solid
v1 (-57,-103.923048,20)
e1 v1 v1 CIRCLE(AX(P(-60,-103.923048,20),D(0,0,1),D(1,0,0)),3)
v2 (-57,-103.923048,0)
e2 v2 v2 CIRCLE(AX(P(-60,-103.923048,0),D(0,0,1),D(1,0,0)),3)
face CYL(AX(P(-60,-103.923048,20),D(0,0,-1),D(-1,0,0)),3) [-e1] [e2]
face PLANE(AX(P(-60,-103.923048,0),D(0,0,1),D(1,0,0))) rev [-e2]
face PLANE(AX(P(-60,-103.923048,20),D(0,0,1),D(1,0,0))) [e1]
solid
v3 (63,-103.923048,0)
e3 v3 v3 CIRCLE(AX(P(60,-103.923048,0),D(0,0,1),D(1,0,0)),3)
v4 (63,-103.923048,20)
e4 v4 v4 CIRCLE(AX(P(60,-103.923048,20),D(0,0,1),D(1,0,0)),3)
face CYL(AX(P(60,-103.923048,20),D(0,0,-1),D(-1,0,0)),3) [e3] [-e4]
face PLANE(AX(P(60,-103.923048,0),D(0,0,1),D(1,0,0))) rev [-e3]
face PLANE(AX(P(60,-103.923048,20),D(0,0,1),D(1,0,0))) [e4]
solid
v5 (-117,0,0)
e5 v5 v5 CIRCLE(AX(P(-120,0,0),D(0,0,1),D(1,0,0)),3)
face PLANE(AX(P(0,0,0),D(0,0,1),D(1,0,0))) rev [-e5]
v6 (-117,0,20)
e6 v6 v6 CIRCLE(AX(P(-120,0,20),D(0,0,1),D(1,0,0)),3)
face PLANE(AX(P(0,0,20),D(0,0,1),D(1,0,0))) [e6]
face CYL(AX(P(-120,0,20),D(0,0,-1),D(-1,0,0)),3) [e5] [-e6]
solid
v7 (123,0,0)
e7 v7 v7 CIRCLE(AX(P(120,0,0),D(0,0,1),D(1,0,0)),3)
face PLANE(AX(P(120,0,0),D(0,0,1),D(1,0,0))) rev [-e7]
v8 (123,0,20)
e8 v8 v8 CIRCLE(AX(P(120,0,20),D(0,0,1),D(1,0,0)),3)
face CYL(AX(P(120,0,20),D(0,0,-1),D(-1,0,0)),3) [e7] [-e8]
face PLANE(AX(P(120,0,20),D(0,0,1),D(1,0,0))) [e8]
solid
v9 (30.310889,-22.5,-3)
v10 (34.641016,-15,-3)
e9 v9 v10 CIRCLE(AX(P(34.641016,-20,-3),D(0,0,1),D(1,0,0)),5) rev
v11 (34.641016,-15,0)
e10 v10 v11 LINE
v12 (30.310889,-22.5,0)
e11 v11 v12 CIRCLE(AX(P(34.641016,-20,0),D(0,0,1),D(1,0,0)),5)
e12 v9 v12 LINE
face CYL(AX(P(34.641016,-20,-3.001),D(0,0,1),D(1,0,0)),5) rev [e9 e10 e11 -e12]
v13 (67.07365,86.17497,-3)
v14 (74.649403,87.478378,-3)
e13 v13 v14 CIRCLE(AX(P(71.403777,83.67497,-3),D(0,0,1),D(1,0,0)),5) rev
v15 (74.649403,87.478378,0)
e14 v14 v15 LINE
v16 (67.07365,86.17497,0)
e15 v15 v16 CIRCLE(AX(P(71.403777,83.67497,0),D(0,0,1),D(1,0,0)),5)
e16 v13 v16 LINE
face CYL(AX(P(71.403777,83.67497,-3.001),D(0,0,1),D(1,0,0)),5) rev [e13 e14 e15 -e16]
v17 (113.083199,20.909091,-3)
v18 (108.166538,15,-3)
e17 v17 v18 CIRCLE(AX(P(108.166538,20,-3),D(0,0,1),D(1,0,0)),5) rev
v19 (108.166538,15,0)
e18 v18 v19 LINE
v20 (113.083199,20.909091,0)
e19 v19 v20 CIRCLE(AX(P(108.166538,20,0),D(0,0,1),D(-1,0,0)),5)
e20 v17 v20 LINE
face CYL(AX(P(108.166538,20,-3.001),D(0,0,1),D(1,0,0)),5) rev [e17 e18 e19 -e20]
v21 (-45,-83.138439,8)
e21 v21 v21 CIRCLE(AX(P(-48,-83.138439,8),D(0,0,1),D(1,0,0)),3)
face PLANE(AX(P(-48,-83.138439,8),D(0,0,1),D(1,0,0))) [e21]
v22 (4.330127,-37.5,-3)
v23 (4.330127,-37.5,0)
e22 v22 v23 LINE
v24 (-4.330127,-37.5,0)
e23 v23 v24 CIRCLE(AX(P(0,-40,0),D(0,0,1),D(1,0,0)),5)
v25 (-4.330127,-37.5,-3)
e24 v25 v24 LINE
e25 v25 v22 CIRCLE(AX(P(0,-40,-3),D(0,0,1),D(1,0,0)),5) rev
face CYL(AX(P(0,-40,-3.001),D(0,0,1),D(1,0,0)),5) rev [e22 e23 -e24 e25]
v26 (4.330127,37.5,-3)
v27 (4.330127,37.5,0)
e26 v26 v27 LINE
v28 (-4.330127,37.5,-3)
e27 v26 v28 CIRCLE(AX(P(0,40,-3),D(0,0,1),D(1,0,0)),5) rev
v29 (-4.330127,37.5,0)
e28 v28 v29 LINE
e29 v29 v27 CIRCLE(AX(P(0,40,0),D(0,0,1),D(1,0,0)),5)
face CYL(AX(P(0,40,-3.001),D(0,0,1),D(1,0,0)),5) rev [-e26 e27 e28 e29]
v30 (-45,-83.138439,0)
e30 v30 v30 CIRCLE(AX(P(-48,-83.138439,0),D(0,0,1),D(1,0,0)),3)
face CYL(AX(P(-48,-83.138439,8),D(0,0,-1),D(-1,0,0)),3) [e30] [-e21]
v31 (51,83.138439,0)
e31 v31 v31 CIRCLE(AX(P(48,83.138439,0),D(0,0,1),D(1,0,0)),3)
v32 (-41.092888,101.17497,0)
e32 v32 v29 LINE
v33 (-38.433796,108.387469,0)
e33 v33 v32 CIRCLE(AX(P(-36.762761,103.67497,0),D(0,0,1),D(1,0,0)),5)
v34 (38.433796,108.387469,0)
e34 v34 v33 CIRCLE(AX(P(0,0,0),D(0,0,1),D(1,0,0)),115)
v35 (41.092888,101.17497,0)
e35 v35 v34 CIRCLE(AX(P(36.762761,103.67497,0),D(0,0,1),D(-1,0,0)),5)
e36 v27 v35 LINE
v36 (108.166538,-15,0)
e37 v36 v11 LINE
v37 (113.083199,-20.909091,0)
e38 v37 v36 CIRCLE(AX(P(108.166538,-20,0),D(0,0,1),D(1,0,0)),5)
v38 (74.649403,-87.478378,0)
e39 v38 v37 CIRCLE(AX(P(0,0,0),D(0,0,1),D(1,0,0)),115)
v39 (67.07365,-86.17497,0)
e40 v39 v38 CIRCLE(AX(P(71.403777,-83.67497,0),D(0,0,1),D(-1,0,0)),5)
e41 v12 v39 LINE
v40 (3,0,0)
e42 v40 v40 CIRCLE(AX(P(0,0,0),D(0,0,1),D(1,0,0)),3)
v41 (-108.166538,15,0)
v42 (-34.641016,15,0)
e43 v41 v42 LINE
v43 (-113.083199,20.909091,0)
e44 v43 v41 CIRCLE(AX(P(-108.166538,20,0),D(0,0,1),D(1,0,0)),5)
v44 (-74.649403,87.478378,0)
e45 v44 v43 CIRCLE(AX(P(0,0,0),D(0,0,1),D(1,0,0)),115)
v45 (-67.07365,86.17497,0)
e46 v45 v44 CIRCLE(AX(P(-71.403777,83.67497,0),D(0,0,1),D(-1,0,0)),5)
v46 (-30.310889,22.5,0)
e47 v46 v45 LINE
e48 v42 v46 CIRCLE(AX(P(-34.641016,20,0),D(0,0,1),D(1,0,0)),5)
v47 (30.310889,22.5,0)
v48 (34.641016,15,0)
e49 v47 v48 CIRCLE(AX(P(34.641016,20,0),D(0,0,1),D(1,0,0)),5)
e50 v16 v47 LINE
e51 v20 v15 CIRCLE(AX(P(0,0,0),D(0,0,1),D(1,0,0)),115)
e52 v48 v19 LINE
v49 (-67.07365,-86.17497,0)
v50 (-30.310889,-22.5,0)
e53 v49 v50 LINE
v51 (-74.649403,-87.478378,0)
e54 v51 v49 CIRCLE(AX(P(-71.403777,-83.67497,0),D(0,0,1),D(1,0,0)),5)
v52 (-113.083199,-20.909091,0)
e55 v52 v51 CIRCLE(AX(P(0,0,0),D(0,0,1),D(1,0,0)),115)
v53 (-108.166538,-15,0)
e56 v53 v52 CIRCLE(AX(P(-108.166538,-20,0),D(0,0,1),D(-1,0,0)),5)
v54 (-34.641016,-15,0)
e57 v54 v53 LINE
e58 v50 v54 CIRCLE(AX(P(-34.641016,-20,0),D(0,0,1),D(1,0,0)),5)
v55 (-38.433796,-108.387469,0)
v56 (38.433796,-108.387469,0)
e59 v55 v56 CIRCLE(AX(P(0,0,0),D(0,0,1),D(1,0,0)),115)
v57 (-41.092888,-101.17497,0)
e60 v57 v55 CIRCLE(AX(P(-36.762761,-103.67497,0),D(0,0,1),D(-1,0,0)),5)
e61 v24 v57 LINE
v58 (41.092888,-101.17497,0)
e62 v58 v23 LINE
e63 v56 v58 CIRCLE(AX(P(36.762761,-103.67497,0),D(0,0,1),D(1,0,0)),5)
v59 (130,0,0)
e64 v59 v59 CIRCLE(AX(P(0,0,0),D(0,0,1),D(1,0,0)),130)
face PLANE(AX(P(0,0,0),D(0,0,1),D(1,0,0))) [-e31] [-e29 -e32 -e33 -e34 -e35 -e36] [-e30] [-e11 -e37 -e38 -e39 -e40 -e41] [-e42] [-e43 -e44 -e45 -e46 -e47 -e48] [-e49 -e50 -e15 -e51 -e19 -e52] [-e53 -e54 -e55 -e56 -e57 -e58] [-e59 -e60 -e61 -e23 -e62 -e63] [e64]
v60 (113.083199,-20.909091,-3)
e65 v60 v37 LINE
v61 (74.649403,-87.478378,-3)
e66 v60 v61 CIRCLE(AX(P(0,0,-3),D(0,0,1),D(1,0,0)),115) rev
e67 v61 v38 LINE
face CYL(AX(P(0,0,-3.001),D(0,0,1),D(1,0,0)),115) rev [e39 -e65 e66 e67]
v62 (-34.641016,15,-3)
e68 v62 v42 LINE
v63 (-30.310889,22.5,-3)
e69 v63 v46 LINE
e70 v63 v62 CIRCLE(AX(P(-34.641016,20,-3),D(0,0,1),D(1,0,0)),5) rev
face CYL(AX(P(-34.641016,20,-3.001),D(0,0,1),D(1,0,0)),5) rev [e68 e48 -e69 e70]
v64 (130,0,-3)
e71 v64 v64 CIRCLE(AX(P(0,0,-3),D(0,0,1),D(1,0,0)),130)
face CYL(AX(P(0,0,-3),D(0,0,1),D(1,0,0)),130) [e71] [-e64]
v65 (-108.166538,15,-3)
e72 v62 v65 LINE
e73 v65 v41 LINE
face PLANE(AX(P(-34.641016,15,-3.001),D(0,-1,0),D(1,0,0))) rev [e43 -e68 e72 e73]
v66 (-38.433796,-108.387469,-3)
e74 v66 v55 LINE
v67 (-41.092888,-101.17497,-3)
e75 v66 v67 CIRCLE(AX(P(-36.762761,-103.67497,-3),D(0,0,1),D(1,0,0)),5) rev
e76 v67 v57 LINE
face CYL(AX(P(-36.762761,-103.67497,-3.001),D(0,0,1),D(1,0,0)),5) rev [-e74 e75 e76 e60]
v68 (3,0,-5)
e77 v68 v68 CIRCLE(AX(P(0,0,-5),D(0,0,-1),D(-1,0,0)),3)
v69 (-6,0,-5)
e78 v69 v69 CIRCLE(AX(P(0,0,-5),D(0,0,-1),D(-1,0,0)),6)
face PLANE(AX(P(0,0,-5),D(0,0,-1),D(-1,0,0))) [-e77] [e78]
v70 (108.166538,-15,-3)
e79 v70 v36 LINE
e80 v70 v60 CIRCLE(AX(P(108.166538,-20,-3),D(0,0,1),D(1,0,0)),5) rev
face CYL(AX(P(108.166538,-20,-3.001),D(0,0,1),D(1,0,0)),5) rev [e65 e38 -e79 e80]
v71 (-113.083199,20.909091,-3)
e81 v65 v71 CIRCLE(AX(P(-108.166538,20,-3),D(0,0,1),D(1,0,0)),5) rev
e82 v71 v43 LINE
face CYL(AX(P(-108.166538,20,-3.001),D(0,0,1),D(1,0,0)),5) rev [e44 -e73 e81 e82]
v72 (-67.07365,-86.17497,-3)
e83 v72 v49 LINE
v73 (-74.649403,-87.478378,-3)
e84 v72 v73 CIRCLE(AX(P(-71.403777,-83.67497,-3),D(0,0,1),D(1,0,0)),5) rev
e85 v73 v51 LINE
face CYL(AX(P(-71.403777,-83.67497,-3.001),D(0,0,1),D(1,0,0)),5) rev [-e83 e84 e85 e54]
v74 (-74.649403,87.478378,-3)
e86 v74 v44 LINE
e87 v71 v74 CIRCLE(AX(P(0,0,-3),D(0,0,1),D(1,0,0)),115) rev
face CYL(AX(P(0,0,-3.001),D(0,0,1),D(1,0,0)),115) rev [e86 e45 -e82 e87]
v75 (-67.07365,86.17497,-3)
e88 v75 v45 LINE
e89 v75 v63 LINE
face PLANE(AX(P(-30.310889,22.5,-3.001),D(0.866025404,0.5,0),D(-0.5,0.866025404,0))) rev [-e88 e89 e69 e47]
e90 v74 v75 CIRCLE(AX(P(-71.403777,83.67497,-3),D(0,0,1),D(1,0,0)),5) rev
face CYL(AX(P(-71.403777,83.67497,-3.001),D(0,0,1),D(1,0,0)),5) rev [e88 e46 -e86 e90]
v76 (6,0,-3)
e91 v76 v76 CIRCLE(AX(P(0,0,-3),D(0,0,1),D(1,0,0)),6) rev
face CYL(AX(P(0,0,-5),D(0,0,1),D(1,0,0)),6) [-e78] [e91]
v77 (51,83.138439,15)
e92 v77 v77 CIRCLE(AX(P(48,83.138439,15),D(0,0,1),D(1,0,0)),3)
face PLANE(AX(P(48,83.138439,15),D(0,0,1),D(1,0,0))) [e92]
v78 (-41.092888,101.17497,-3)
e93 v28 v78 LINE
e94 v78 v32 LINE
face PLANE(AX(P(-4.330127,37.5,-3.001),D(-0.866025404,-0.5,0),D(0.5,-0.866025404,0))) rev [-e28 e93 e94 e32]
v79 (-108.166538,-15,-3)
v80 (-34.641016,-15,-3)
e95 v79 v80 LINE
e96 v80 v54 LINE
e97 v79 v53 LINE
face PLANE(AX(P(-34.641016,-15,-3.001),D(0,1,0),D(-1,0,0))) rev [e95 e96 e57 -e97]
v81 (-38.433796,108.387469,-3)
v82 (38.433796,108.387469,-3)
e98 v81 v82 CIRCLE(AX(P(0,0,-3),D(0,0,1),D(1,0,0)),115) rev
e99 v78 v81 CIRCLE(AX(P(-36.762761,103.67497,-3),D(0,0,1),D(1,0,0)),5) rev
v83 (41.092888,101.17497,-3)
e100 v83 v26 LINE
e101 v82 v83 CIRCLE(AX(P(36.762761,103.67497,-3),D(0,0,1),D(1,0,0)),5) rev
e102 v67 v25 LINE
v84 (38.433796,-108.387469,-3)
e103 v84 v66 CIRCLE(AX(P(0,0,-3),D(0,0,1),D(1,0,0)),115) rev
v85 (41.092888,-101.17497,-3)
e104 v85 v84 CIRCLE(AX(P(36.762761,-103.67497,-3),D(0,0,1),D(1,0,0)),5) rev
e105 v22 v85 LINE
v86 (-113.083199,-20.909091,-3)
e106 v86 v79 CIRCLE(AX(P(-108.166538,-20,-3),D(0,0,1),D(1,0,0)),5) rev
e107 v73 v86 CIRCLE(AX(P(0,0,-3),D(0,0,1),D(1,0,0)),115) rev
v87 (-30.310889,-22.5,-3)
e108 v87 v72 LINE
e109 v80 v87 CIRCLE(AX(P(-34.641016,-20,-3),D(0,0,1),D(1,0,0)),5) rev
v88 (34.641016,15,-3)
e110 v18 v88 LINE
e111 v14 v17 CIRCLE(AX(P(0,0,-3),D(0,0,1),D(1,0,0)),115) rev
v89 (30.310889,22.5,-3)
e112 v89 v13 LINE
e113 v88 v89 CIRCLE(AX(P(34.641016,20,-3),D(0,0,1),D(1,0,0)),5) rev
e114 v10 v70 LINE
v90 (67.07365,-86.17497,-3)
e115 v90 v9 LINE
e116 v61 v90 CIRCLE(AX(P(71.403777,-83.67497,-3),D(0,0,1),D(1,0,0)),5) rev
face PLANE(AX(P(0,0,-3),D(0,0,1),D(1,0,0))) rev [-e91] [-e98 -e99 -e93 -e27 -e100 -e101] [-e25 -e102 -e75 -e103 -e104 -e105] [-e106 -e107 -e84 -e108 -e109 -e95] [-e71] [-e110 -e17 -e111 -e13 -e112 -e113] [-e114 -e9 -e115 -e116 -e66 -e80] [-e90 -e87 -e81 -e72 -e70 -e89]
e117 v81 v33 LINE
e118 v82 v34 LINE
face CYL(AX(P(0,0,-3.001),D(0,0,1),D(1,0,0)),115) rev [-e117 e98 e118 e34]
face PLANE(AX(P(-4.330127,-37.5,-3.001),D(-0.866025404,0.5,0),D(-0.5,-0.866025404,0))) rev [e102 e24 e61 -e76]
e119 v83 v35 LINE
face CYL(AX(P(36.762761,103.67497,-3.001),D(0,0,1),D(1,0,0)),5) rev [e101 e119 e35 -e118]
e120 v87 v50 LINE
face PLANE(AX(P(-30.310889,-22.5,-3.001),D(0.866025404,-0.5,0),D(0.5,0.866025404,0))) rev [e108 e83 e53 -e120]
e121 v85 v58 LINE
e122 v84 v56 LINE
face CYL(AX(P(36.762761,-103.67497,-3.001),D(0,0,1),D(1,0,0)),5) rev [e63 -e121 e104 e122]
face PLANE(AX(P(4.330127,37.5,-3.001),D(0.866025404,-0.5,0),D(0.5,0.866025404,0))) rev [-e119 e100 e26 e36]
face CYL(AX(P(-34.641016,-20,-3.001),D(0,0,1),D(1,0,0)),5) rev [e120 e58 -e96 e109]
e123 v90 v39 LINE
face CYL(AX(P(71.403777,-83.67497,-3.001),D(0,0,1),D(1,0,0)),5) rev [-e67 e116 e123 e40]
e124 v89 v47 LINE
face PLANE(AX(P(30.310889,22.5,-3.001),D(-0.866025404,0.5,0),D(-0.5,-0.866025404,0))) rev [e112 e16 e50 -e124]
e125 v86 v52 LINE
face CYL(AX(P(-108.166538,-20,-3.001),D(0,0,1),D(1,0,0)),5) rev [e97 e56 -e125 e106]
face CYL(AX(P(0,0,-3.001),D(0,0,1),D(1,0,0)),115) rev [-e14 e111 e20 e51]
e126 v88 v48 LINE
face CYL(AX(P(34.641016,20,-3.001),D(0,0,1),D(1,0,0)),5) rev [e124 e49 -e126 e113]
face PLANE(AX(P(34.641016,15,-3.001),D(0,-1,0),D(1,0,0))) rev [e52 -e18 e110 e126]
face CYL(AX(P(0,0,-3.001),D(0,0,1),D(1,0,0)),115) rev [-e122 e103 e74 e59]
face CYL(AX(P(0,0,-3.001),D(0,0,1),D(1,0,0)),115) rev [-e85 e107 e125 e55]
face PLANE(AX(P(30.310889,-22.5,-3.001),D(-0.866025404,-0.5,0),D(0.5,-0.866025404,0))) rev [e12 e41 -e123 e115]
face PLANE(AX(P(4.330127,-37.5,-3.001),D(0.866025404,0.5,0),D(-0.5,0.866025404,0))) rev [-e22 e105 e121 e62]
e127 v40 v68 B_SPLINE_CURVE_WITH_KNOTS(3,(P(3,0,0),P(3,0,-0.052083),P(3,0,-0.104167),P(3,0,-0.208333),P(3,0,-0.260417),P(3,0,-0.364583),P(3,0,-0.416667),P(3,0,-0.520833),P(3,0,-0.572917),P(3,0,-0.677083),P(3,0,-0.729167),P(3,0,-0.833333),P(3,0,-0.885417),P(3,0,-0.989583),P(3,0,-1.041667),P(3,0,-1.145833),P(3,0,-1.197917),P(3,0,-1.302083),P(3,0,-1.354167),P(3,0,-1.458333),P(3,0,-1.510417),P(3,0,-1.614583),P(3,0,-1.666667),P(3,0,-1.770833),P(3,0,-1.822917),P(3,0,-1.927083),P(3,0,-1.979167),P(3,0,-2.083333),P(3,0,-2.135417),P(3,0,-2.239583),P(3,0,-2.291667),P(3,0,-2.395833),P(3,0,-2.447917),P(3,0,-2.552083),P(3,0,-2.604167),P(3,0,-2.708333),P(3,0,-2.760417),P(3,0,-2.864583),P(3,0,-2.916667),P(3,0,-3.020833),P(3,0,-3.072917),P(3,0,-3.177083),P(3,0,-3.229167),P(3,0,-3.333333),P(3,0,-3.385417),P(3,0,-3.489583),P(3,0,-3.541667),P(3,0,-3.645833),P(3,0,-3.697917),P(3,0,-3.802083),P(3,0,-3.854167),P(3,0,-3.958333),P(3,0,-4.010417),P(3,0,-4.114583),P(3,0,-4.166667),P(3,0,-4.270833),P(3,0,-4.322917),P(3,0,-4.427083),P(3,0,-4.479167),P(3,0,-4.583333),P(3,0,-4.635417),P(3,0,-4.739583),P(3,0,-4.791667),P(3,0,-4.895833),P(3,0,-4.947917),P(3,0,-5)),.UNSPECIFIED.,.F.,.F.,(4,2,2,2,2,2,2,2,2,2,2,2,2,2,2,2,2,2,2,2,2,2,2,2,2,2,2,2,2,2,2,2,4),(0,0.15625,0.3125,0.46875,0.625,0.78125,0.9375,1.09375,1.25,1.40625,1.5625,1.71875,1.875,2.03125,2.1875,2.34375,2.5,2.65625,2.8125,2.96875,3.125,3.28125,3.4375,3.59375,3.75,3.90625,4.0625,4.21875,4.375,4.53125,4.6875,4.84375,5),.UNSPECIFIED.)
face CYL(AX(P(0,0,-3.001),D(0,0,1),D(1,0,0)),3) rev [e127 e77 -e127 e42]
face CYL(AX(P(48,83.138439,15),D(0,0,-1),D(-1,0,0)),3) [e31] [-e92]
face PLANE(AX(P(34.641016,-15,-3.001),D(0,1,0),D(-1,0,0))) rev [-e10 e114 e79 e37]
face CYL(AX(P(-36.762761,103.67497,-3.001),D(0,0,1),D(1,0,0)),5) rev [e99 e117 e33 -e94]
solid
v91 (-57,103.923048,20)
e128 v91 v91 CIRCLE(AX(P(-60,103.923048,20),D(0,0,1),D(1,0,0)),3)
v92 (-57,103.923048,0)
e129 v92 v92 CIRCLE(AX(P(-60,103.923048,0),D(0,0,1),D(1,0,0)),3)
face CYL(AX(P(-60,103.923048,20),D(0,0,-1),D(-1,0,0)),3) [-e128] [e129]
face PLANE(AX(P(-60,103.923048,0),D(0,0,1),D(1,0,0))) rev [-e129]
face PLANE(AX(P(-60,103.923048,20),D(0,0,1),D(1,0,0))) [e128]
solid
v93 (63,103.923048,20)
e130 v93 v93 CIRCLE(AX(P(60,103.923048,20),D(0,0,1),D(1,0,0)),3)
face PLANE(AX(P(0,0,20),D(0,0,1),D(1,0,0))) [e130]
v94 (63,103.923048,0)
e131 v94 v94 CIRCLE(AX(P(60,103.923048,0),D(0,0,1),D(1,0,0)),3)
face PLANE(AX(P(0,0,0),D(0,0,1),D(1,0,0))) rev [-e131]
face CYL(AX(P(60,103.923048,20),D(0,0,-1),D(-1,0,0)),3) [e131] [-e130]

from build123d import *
from build123d.topology import SkipClean

# Parameters (mm, degrees)
SKETCH_1_R          = 130
EXTRUDE_1_DEPTH     = 3
SKETCH_2_R          = 3
EXTRUDE_2_DEPTH     = 20
EXTRUDE_2_2_DEPTH   = 20
EXTRUDE_2_3_DEPTH   = 20
EXTRUDE_2_4_DEPTH   = 20
EXTRUDE_2_5_DEPTH   = 20
EXTRUDE_2_6_DEPTH   = 20
CUT_EXTRUDE_1_DEPTH = 3
SKETCH_5_R          = 3
EXTRUDE_4_DEPTH     = 8
SKETCH_6_R          = 3
EXTRUDE_5_DEPTH     = 15
SKETCH_3_R          = 3
CUT_EXTRUDE_2_DEPTH = 3
SKETCH_7_R          = 6
SKETCH_7_R_2        = 3
EXTRUDE_1_2_DEPTH   = 2


with BuildPart() as part:
    # 草图1 → Extrude 1 (new body)
    with BuildSketch(Plane.XY):
        Circle(SKETCH_1_R)
    extrude(amount=-EXTRUDE_1_DEPTH)

    # 草图4 → 切除-拉伸1 (cut)
    with BuildSketch(Plane.XY):
        with BuildLine():
            Line((-30.310889132, -22.5), (-67.073650189, -86.174969976))
            ThreePointArc((-67.073650189, -86.174969976), (-70.555983948, -88.602570466), (-74.649403444, -87.478377702))
            ThreePointArc((-74.649403444, -87.478377702), (-99.592921435, -57.5), (-113.083199094, -20.909090909))
            ThreePointArc((-113.083199094, -20.909090909), (-112.010068838, -16.801989255), (-108.166538264, -15))
            Line((-108.166538264, -15), (-34.641016151, -15))
            ThreePointArc((-34.641016151, -15), (-30.310889132, -17.5), (-30.310889132, -22.5))
        make_face()
        with BuildLine():
            Line((-34.641016151, 15), (-108.166538264, 15))
            ThreePointArc((-108.166538264, 15), (-112.010068838, 16.801989255), (-113.083199094, 20.909090909))
            ThreePointArc((-113.083199094, 20.909090909), (-99.592921435, 57.5), (-74.649403444, 87.478377702))
            ThreePointArc((-74.649403444, 87.478377702), (-70.555983948, 88.602570466), (-67.073650189, 86.174969976))
            Line((-67.073650189, 86.174969976), (-30.310889132, 22.5))
            ThreePointArc((-30.310889132, 22.5), (-30.310889132, 17.5), (-34.641016151, 15))
        make_face()
        with BuildLine():
            Line((-4.330127019, 37.5), (-41.092888075, 101.174969976))
            ThreePointArc((-41.092888075, 101.174969976), (-41.45408489, 105.404559721), (-38.43379565, 108.387468611))
            ThreePointArc((-38.43379565, 108.387468611), (0, 115), (38.43379565, 108.387468611))
            ThreePointArc((38.43379565, 108.387468611), (41.45408489, 105.404559721), (41.092888075, 101.174969976))
            Line((41.092888075, 101.174969976), (4.330127019, 37.5))
            ThreePointArc((4.330127019, 37.5), (0, 35), (-4.330127019, 37.5))
        make_face()
        with BuildLine():
            Line((30.310889132, 22.5), (67.073650189, 86.174969976))
            ThreePointArc((67.073650189, 86.174969976), (70.555983948, 88.602570466), (74.649403444, 87.478377702))
            ThreePointArc((74.649403444, 87.478377702), (99.592921435, 57.5), (113.083199094, 20.909090909))
            ThreePointArc((113.083199094, 20.909090909), (112.010068838, 16.801989255), (108.166538264, 15))
            Line((108.166538264, 15), (34.641016151, 15))
            ThreePointArc((34.641016151, 15), (30.310889132, 17.5), (30.310889132, 22.5))
        make_face()
        with BuildLine():
            Line((34.641016151, -15), (108.166538264, -15))
            ThreePointArc((108.166538264, -15), (112.010068838, -16.801989255), (113.083199094, -20.909090909))
            ThreePointArc((113.083199094, -20.909090909), (99.592921435, -57.5), (74.649403444, -87.478377702))
            ThreePointArc((74.649403444, -87.478377702), (70.555983948, -88.602570466), (67.073650189, -86.174969976))
            Line((67.073650189, -86.174969976), (30.310889132, -22.5))
            ThreePointArc((30.310889132, -22.5), (30.310889132, -17.5), (34.641016151, -15))
        make_face()
        with BuildLine():
            Line((4.330127019, -37.5), (41.092888075, -101.174969976))
            ThreePointArc((41.092888075, -101.174969976), (41.45408489, -105.404559721), (38.43379565, -108.387468611))
            ThreePointArc((38.43379565, -108.387468611), (0, -115), (-38.43379565, -108.387468611))
            ThreePointArc((-38.43379565, -108.387468611), (-41.45408489, -105.404559721), (-41.092888075, -101.174969976))
            Line((-41.092888075, -101.174969976), (-4.330127019, -37.5))
            ThreePointArc((-4.330127019, -37.5), (0, -35), (4.330127019, -37.5))
        make_face()
    extrude(amount=-CUT_EXTRUDE_1_DEPTH, mode=Mode.SUBTRACT)

    # 草图5 → 凸台-拉伸4 (add)
    with BuildSketch(Plane.XY):
        with Locations((-48, -83.138438763)):
            Circle(SKETCH_5_R)
    extrude(amount=EXTRUDE_4_DEPTH)

    # 草图6 → 凸台-拉伸5 (add)
    with BuildSketch(Plane.XY):
        with Locations((48, 83.138438763)):
            Circle(SKETCH_6_R)
    extrude(amount=EXTRUDE_5_DEPTH)

    # 草图3 → 切除-拉伸2 (cut)
    with BuildSketch(Plane.XY):
        Circle(SKETCH_3_R)
    extrude(amount=-CUT_EXTRUDE_2_DEPTH, mode=Mode.SUBTRACT)

    # 草图7 → Extrude 1 2 (add)
    with SkipClean():  # the faces are left unmerged after this step: merging them gives an invalid solid
        with BuildSketch(Plane(origin=(0, 0, -3), x_dir=(-1, 0, 0), z_dir=(0, 0, -1))):
            Circle(SKETCH_7_R)
            Circle(SKETCH_7_R_2, mode=Mode.SUBTRACT)
        extrude(amount=EXTRUDE_1_2_DEPTH)
    add(part.part.scale(1), mode=Mode.REPLACE)  # the faces are merged on a copy


with BuildPart() as body_2:
    # 草图2 → 凸台-拉伸2 (new body)
    with BuildSketch(Plane.XY):
        with Locations((-120, 0)):
            Circle(SKETCH_2_R)
    extrude(amount=EXTRUDE_2_DEPTH)


with BuildPart() as body_3:
    # 草图2 → Extrude 2 2 (new body)
    with BuildSketch(Plane.XY):
        with Locations((-60, 103.923048454)):
            Circle(SKETCH_2_R)
    extrude(amount=EXTRUDE_2_2_DEPTH)


with BuildPart() as body_4:
    # 草图2 → Extrude 2 3 (new body)
    with BuildSketch(Plane.XY):
        with Locations((60, 103.923048454)):
            Circle(SKETCH_2_R)
    extrude(amount=EXTRUDE_2_3_DEPTH)


with BuildPart() as body_5:
    # 草图2 → Extrude 2 4 (new body)
    with BuildSketch(Plane.XY):
        with Locations((120, 0)):
            Circle(SKETCH_2_R)
    extrude(amount=EXTRUDE_2_4_DEPTH)


with BuildPart() as body_6:
    # 草图2 → Extrude 2 5 (new body)
    with BuildSketch(Plane.XY):
        with Locations((60, -103.923048454)):
            Circle(SKETCH_2_R)
    extrude(amount=EXTRUDE_2_5_DEPTH)


with BuildPart() as body_7:
    # 草图2 → Extrude 2 6 (new body)
    with BuildSketch(Plane.XY):
        with Locations((-60, -103.923048454)):
            Circle(SKETCH_2_R)
    extrude(amount=EXTRUDE_2_6_DEPTH)


solid = Compound([part.part, body_2.part, body_3.part, body_4.part, body_5.part, body_6.part, body_7.part])
